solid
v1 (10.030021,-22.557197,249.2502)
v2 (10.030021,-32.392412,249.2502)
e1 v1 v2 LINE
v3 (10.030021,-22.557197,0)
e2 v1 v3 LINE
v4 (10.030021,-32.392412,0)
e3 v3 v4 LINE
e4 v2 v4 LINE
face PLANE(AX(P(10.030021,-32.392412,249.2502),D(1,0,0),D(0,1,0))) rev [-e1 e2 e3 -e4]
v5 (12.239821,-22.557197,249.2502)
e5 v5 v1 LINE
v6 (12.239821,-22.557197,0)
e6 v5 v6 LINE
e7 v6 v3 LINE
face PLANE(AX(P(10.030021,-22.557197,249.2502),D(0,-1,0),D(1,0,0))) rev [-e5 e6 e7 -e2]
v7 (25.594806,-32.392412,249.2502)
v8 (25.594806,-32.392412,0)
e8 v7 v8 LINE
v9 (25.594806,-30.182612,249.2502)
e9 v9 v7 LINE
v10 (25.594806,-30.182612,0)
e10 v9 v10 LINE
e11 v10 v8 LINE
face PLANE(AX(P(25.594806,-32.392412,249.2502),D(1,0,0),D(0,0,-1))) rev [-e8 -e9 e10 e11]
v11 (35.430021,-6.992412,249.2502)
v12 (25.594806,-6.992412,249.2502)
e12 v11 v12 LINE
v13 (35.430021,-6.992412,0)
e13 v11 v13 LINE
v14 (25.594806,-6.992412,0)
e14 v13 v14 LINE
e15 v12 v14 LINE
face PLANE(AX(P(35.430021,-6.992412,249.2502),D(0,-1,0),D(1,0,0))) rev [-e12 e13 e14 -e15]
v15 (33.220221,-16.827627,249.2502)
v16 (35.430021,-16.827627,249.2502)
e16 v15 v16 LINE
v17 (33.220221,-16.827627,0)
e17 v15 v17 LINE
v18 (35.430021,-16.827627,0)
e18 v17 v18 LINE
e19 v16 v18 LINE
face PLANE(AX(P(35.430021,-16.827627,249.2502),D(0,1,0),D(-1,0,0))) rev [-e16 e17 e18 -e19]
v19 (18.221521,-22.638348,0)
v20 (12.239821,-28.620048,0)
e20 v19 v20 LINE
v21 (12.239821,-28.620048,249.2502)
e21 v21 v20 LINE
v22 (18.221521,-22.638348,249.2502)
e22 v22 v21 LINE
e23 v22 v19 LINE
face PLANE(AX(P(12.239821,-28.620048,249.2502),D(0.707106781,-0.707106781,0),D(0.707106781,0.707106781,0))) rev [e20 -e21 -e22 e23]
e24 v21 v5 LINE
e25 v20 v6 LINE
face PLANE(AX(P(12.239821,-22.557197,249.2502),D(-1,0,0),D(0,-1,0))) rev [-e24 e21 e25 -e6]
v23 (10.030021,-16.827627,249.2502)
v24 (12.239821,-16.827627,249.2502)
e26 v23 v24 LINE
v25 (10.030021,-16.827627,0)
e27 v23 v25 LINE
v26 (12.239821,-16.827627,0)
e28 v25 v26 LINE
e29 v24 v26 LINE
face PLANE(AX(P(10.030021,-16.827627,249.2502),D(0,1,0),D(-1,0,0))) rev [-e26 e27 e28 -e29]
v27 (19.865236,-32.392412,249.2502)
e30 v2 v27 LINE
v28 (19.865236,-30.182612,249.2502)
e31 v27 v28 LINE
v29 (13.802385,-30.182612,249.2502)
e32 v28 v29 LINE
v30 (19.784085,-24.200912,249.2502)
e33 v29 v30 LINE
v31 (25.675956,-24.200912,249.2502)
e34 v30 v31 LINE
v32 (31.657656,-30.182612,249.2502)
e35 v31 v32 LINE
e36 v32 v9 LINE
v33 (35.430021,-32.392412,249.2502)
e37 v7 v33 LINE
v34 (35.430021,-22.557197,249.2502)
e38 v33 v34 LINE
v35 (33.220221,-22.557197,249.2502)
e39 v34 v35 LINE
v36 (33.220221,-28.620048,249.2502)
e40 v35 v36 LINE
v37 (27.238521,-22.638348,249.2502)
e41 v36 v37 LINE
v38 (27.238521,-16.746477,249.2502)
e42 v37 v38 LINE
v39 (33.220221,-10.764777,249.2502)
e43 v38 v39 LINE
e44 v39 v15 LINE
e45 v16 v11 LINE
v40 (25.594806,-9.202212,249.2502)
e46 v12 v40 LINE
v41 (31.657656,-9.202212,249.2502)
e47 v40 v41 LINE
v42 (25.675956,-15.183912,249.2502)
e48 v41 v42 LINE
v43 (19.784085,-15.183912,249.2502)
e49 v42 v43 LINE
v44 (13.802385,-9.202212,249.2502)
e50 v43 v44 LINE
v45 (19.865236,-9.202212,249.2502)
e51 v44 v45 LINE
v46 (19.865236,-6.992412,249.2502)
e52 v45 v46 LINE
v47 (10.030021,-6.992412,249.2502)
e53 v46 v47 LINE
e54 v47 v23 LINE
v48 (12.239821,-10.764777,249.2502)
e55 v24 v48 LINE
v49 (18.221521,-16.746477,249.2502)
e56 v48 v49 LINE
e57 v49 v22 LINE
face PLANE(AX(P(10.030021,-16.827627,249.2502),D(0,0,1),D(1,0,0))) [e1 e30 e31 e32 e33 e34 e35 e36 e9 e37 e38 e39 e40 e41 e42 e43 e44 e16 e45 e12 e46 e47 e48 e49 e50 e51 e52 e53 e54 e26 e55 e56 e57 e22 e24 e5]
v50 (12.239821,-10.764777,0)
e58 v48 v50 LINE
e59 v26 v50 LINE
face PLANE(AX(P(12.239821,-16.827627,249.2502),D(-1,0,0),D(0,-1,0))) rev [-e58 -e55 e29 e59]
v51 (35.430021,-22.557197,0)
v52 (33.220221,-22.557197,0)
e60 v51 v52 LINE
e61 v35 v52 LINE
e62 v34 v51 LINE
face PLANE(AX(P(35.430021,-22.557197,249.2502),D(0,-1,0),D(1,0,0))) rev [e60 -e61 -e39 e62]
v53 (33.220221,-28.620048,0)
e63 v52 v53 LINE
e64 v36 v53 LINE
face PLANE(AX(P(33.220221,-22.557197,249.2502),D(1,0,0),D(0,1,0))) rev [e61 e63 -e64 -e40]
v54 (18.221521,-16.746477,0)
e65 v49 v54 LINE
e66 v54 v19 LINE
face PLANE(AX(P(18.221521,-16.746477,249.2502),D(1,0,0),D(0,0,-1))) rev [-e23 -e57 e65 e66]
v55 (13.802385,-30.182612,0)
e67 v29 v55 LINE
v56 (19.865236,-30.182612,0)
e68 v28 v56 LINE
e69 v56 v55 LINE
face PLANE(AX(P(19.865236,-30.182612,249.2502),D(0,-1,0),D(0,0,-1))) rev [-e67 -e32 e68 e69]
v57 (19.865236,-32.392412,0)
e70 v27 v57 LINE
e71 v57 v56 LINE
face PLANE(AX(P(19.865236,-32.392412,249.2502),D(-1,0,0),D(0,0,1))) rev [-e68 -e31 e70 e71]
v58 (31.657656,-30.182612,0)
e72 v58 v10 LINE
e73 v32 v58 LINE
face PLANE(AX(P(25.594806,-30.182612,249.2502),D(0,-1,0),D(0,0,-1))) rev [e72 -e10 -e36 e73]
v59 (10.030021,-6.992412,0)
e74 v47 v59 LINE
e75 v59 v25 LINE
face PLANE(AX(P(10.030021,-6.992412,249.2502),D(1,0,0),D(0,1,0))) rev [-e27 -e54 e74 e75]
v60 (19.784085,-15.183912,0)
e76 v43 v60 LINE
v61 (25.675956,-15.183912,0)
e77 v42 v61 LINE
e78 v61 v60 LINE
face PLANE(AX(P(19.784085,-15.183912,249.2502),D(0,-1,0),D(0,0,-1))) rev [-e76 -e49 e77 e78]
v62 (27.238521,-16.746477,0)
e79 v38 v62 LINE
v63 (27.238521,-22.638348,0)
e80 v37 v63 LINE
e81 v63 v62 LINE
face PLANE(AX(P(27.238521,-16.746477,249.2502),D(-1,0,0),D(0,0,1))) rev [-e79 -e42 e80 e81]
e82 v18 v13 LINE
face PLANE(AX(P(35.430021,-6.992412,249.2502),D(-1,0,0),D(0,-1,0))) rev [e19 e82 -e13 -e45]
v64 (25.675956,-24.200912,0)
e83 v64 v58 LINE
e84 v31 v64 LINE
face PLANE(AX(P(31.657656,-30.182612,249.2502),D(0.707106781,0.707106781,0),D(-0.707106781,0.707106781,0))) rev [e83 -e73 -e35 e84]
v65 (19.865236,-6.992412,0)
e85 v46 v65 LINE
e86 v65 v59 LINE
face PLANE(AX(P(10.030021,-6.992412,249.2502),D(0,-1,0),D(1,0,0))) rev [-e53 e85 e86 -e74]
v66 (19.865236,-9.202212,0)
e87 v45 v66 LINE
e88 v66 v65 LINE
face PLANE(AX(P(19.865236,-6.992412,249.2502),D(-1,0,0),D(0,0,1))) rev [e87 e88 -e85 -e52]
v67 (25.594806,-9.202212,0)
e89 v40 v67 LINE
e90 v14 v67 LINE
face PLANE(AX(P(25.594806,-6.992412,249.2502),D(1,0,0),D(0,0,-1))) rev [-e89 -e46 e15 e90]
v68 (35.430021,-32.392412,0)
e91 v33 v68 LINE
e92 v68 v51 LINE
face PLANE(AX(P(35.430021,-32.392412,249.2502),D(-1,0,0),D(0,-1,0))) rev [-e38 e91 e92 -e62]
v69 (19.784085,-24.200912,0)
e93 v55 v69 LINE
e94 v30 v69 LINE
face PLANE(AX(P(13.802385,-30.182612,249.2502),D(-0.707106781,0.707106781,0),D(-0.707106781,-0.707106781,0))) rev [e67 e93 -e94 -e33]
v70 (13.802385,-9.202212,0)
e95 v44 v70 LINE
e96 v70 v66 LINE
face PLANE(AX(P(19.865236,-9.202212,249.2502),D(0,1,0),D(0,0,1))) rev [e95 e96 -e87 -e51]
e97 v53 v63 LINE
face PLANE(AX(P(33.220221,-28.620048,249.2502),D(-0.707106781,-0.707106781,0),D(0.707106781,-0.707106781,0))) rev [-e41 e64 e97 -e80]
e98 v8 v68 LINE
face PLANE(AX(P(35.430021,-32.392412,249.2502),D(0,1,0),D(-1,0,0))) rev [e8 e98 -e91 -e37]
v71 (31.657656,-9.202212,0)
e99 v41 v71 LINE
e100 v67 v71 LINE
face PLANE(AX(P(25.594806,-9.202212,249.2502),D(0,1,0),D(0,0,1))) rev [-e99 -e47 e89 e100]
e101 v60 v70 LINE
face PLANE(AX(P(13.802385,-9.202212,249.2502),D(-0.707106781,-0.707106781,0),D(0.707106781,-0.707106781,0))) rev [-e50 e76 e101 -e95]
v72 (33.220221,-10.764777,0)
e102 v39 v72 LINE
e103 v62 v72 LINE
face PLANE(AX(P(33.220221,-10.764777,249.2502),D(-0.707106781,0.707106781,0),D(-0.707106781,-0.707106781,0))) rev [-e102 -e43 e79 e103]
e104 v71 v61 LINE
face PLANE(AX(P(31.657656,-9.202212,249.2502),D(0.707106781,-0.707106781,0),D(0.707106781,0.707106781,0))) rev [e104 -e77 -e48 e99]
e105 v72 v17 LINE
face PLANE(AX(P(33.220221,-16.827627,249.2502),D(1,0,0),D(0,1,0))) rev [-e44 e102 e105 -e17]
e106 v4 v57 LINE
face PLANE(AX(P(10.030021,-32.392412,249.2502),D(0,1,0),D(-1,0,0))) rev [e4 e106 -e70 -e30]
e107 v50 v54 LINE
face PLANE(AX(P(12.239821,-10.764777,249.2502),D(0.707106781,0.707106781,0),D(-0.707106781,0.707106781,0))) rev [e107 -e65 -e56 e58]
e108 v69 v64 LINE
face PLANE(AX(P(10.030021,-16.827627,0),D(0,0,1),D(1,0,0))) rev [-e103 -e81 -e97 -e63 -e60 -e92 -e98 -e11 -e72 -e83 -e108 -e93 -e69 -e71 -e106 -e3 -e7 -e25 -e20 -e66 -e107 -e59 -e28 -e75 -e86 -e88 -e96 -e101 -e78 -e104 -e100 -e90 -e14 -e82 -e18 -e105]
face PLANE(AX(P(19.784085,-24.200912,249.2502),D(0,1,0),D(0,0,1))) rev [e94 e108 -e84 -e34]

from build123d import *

# Parameters (mm, degrees)
EXTRUDE1_DEPTH = 249.2502


# Read off the part's stored shape, not the designer's step: 1010<1>
with BuildPart() as part:
    # Sketch1<2> → Extrude1 (new body)
    with BuildSketch(Plane.XY):
        Polygon((10.030020765, -6.992412451), (19.865235782, -6.992412451), (19.865235782, -9.202212451), (13.80238533, -9.202212451), (19.78408533, -15.183912451), (25.6759562, -15.183912451), (31.6576562, -9.202212451), (25.594805747, -9.202212451), (25.594805747, -6.992412451), (35.430020765, -6.992412451), (35.430020765, -16.827627469), (33.220220765, -16.827627469), (33.220220765, -10.764777016), (27.238520765, -16.746477016), (27.238520765, -22.638347886), (33.220220765, -28.620047886), (33.220220765, -22.557197434), (35.430020765, -22.557197434), (35.430020765, -32.392412451), (25.594805747, -32.392412451), (25.594805747, -30.182612451), (31.6576562, -30.182612451), (25.6759562, -24.200912451), (19.78408533, -24.200912451), (13.80238533, -30.182612451), (19.865235782, -30.182612451), (19.865235782, -32.392412451), (10.030020765, -32.392412451), (10.030020765, -22.557197434), (12.239820765, -22.557197434), (12.239820765, -28.620047886), (18.221520765, -22.638347886), (18.221520765, -16.746477016), (12.239820765, -10.764777016), (12.239820765, -16.827627469), (10.030020765, -16.827627469), align=None)
    extrude(amount=EXTRUDE1_DEPTH)


solid = part.part
